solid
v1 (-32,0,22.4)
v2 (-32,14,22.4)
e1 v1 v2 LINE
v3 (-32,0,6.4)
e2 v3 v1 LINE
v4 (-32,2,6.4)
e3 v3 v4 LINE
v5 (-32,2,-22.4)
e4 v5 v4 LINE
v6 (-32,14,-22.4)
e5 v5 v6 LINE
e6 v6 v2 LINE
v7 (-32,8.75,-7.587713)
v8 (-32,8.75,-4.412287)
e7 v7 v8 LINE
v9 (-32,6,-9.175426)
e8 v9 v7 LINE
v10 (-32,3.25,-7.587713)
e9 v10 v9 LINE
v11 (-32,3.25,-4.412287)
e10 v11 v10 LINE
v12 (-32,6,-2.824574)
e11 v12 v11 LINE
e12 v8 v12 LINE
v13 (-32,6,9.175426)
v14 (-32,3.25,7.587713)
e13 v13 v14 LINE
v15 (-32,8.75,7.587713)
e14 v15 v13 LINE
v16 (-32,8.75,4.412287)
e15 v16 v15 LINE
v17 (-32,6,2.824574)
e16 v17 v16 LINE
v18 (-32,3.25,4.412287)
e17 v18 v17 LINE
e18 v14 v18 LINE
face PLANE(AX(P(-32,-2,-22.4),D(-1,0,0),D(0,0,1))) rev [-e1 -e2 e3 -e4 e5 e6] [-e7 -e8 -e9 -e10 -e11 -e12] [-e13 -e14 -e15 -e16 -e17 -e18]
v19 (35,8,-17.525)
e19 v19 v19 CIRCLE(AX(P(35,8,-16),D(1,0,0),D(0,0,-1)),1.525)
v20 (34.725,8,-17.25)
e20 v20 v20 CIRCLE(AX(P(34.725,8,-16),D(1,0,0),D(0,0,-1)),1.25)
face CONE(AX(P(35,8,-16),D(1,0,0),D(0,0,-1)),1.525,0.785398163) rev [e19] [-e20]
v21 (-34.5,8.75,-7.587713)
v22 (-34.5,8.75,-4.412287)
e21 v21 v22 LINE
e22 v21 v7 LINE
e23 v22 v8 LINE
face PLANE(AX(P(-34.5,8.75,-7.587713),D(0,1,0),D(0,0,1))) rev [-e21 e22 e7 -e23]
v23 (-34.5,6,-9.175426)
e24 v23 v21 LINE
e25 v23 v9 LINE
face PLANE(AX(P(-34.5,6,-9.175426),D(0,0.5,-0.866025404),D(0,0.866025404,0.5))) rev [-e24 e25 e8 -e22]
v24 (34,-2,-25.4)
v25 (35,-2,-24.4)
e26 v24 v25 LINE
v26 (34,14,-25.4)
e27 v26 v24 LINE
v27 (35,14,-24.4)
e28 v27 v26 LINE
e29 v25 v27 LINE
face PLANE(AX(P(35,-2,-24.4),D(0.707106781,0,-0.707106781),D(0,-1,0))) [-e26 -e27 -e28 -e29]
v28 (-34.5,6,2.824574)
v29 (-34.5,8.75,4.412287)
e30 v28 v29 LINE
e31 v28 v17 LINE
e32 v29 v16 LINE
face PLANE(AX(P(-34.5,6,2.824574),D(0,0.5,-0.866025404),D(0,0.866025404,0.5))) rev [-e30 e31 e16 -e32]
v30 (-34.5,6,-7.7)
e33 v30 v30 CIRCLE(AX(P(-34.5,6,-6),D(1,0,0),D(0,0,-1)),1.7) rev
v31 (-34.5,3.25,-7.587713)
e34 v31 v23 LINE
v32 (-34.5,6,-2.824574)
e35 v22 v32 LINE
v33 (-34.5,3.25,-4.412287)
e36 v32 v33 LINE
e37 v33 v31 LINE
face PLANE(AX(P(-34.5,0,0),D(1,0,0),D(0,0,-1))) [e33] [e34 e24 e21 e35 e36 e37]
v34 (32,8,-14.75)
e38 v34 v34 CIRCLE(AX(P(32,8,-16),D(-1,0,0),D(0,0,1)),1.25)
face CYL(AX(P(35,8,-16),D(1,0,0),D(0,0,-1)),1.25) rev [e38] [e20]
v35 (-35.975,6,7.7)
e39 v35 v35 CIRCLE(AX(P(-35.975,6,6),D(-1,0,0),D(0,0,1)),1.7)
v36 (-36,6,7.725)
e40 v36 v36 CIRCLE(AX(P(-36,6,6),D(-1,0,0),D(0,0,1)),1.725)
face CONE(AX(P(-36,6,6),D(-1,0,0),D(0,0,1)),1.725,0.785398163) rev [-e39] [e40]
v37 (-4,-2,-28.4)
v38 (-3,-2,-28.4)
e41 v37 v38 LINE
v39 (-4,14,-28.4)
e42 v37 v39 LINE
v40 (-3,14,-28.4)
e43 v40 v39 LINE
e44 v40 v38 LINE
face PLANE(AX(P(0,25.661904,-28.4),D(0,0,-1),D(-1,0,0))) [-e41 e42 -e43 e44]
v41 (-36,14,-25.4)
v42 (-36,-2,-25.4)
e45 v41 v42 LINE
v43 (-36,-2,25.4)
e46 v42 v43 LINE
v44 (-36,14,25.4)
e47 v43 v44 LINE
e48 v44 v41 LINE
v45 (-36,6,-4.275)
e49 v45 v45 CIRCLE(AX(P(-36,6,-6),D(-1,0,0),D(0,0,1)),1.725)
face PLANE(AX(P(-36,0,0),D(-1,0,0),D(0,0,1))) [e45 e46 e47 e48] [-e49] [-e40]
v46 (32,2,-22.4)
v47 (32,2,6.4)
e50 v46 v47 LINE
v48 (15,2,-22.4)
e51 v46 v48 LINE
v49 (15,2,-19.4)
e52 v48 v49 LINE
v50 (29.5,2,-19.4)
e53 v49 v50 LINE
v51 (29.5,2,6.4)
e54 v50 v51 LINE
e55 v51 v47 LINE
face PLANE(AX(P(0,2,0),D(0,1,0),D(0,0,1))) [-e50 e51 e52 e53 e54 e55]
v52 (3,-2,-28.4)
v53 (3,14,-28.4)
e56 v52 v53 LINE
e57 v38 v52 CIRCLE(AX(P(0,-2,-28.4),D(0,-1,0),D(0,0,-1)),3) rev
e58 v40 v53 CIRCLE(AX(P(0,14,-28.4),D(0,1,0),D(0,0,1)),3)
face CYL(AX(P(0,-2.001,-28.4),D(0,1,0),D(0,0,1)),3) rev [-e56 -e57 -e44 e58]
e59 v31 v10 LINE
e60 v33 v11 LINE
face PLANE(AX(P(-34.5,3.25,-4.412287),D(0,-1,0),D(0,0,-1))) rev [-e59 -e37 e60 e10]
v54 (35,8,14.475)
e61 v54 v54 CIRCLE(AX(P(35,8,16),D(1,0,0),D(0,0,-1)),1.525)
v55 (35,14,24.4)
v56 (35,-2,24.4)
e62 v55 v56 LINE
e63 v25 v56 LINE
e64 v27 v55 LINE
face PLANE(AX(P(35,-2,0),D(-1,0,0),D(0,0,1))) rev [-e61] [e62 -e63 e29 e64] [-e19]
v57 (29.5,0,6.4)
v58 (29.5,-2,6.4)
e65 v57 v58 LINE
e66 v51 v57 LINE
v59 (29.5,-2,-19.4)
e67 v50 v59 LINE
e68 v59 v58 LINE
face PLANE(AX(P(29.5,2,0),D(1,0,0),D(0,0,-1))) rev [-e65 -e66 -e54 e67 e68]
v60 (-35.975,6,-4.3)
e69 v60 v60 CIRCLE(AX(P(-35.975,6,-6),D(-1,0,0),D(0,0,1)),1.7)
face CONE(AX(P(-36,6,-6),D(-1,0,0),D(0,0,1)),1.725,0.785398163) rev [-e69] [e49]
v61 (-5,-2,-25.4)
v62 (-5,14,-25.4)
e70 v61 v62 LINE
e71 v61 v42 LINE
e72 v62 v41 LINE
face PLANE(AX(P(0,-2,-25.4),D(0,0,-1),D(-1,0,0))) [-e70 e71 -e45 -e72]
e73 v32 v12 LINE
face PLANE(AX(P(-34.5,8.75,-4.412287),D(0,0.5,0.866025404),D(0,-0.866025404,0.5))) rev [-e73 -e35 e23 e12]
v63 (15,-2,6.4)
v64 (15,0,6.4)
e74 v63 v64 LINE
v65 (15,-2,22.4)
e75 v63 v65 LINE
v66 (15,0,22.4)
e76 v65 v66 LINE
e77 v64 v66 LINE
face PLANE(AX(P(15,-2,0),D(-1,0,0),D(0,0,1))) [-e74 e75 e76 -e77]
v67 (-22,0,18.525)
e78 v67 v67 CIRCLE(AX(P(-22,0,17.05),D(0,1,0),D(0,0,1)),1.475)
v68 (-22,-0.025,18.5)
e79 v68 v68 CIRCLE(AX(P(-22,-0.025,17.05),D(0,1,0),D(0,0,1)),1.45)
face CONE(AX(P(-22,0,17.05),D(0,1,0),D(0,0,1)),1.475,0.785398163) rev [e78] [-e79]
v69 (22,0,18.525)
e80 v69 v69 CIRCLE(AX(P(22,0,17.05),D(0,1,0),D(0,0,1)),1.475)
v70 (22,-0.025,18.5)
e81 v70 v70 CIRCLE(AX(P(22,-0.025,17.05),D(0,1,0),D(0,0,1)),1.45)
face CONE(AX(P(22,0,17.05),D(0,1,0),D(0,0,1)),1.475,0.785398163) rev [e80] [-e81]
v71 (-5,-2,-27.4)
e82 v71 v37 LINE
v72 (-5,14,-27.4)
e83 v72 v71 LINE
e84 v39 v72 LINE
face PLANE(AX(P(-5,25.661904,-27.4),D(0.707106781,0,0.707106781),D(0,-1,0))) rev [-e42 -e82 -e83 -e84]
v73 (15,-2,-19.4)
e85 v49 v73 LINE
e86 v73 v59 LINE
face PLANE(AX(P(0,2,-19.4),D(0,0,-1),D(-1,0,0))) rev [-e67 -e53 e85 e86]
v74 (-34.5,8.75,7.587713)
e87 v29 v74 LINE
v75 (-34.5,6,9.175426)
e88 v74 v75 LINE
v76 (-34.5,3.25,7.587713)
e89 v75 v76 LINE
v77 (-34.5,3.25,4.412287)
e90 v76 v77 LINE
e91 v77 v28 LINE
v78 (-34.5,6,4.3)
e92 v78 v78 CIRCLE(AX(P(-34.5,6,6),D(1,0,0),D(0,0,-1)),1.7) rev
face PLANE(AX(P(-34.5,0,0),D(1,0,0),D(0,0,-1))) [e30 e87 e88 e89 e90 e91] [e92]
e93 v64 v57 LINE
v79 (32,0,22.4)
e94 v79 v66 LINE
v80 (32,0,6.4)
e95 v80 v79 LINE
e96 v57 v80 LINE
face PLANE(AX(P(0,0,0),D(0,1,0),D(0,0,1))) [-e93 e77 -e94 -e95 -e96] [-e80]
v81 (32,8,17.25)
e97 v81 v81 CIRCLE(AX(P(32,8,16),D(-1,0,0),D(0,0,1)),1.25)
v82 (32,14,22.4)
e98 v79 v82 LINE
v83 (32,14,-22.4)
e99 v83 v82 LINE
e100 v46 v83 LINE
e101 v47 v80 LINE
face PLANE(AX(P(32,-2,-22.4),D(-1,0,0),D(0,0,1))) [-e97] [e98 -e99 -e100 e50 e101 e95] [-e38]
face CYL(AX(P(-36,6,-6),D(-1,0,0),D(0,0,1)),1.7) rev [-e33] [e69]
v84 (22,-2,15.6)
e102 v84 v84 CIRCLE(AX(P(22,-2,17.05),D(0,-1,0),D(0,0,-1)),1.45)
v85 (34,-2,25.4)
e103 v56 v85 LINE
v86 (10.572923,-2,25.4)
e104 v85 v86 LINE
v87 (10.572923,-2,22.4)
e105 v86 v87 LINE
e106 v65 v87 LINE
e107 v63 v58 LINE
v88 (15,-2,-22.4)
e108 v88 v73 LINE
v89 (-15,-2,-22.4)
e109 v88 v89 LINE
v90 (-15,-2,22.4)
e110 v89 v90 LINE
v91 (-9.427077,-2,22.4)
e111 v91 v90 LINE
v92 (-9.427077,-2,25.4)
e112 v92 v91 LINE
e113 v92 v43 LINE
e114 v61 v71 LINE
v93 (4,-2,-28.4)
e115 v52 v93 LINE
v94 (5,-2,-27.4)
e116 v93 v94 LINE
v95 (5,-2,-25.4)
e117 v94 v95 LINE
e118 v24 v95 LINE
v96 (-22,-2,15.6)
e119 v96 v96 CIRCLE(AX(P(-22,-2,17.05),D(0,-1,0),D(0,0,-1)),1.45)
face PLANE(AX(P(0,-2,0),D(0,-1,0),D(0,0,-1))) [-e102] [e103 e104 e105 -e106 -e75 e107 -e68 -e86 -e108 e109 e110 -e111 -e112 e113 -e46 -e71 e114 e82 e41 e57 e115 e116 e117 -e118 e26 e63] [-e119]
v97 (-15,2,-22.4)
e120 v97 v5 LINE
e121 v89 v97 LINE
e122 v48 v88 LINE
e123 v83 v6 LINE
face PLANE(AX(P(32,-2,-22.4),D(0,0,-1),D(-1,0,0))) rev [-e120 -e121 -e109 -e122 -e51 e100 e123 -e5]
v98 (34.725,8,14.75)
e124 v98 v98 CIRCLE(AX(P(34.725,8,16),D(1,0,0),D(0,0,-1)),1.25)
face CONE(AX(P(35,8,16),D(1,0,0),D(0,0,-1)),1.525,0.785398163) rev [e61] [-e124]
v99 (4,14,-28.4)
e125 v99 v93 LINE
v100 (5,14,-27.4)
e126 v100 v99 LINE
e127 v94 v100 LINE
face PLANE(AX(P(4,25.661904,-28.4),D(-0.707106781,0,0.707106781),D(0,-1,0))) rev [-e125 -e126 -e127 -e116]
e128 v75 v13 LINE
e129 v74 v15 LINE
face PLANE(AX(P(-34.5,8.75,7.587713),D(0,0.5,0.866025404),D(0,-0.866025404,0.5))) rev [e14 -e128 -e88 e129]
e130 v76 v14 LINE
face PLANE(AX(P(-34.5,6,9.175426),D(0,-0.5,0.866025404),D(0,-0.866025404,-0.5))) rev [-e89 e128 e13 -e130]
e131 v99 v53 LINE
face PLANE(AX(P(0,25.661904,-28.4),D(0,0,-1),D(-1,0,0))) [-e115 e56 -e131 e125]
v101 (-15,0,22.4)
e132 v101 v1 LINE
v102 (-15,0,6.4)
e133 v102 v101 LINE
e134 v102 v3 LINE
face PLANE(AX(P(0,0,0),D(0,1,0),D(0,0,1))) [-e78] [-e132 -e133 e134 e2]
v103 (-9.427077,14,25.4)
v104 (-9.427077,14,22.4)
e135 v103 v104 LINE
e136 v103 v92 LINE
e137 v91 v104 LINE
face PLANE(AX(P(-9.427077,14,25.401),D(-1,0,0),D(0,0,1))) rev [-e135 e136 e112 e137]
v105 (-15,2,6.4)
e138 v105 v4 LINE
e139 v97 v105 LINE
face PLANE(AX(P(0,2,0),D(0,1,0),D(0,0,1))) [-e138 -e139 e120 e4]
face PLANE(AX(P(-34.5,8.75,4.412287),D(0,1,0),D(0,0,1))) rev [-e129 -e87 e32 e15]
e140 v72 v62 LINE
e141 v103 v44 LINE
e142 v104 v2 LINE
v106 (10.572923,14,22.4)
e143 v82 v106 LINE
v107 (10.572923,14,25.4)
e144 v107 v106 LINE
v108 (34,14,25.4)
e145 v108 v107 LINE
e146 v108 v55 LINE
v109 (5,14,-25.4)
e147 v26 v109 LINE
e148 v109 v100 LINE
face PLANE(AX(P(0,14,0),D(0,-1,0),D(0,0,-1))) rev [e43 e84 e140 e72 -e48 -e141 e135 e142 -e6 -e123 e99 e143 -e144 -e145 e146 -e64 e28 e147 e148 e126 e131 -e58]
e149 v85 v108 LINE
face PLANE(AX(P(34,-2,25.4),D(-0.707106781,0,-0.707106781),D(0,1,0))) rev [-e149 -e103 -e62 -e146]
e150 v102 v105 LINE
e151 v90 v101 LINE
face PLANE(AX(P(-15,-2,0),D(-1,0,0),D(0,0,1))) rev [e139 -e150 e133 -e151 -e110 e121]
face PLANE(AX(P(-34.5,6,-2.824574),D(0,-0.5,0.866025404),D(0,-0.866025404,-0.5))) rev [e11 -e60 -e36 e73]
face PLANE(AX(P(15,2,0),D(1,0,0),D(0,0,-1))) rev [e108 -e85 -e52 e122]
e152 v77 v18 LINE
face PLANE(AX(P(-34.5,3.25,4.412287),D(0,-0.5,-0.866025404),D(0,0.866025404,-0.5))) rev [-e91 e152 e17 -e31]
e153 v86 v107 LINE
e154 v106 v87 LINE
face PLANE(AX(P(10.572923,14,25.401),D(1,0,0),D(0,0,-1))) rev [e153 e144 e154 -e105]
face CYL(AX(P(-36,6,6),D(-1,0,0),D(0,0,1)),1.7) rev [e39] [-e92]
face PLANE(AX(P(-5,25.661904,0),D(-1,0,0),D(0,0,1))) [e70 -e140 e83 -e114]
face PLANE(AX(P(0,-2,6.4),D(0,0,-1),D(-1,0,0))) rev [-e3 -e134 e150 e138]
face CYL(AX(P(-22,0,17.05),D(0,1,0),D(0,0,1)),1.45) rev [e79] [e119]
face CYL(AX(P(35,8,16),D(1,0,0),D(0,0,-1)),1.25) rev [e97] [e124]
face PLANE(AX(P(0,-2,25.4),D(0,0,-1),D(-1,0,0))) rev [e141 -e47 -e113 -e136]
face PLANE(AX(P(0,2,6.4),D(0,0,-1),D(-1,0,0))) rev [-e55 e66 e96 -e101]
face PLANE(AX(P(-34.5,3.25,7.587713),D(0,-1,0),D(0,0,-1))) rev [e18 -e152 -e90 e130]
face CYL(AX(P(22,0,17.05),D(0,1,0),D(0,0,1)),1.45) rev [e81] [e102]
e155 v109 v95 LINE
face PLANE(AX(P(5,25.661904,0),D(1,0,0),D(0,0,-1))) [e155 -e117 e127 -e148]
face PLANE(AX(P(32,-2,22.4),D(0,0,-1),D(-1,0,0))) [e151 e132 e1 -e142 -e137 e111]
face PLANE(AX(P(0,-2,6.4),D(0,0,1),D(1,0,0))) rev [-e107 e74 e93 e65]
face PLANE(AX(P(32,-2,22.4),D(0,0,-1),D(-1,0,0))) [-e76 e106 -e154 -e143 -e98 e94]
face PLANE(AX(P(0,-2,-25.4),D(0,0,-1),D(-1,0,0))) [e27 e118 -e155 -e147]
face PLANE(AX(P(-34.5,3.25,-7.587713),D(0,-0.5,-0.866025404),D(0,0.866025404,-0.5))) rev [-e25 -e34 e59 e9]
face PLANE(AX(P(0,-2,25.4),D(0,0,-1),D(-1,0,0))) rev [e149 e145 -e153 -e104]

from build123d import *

# Parameters (mm, degrees)
EXTRUDE_1_DEPTH              = 14
EXTRUDE_1_DEPTH_BACK         = 2
SKETCH_1_W                   = 70
SKETCH_1_H                   = 50.8
SKETCH_1_W_2                 = 64
SKETCH_1_H_2                 = 44.8
EXTRUDE_1_2_DEPTH            = 2
EXTRUDE_1_2_DEPTH_BACK       = 2
SKETCH_1_3_W                 = 17
SKETCH_1_3_H                 = 28.8
SKETCH_1_4_W                 = 17
SKETCH_1_4_H                 = 16
EXTRUDE_2_DEPTH              = 2
CUT_EXTRUDE_1_REACH          = 62.876
SKETCH_3_W                   = 20
SKETCH_3_H                   = 16
EXTRUDE_START                = -2
EXTRUDE_5_OUTLINE_W          = 10
EXTRUDE_5_OUTLINE_H          = 3
EXTRUDE_5_DEPTH              = 16
CUT_EXTRUDE_2_REACH          = 49.828
SKETCH_11_R                  = 3
CHAMFER_1_SIZE               = 1
HOLE_WIZARD_M3_1_D           = 2.5
HOLE_WIZARD_M3_1_DEPTH       = 3
HOLE_WIZARD_M3_1_CSINK_D     = 3.05
HOLE_WIZARD_M3_1_CSINK_ANGLE = 90
SKETCH_16_W                  = 50.8
SKETCH_16_H                  = 16
EXTRUDE_6_DEPTH              = 1
CUT_EXTRUDE_3_DEPTH          = 2.5


# Read off the part's stored shape, not the designer's step: M2.5 间隙孔1, 凸台-拉伸5, M3 间隙孔1
with BuildPart() as part:
    # 草图1 → Extrude 1 (new, two sides: drawn at the far end of the back side and taken through both)
    with BuildSketch(Plane(origin=(0, 0, 0), x_dir=(1, 0, 0), z_dir=(0, 1, 0)).offset(-EXTRUDE_1_DEPTH_BACK)):
        Rectangle(SKETCH_1_W, SKETCH_1_H)
        Rectangle(SKETCH_1_W_2, SKETCH_1_H_2, mode=Mode.SUBTRACT)
    extrude(amount=EXTRUDE_1_DEPTH + EXTRUDE_1_DEPTH_BACK)

    # 草图1<3> → Extrude 1 2 (add, two sides: drawn at the far end of the back side and taken through both)
    with BuildSketch(Plane(origin=(0, 0, 0), x_dir=(1, 0, 0), z_dir=(0, 1, 0)).offset(-EXTRUDE_1_2_DEPTH_BACK)):
        Polygon((32, 22.4), (15, 22.4), (15, 19.4), (29.5, 19.4), (29.5, -6.4), (32, -6.4), align=None)
        with Locations((-23.5, 8)):
            Rectangle(SKETCH_1_3_W, SKETCH_1_3_H)
    extrude(amount=EXTRUDE_1_2_DEPTH + EXTRUDE_1_2_DEPTH_BACK)

    # 草图1<4> → 凸台-拉伸2 (add)
    with BuildSketch(Plane(origin=(0, 0, 0), x_dir=(1, 0, 0), z_dir=(0, 1, 0))):
        Polygon((15, -6.4), (15, -22.4), (32, -22.4), (32, -6.4), (29.5, -6.4), align=None)
        with Locations((-23.5, -14.4)):
            Rectangle(SKETCH_1_4_W, SKETCH_1_4_H)
    extrude(amount=-EXTRUDE_2_DEPTH)

    # 草图3 → 切除-拉伸1 (cut, up to next)
    with BuildSketch(Plane(origin=(0, 0, 22.4), x_dir=(-1, 0, 0), z_dir=(0, 0, -1)), mode=Mode.PRIVATE) as cut_extrude_1_sk1:
        with Locations((-0.572922779, 6)):
            Rectangle(SKETCH_3_W, SKETCH_3_H)
    cut_extrude_1_tool1 = extrude(cut_extrude_1_sk1.sketch, amount=-CUT_EXTRUDE_1_REACH, mode=Mode.PRIVATE) & part.part
    add(cut_extrude_1_tool1.solids().sort_by_distance((0.572923, 6, 22.4))[0], mode=Mode.SUBTRACT)

    # M2.5 间隙孔1 outline → M2.5 间隙孔1 (revolve, cut)
    with BuildSketch(Plane(origin=(22, 0, 17.05), x_dir=(1, 0, 0), z_dir=(0, 0, 1))):
        Polygon((0, -2), (1.45, -2), (1.45, -0.025), (1.475, 0), (0, 0), align=None)
    revolve(axis=Axis((22, 0, 17.05), (0, 1, 0)), mode=Mode.SUBTRACT)

    # Hole Wizard M2.5 _1 2 outline → Hole Wizard M2.5 _1 2 (revolve, cut)
    with BuildSketch(Plane(origin=(-22, 0, 17.05), x_dir=(1, 0, 0), z_dir=(0, 0, 1))):
        Polygon((0, -2), (1.45, -2), (1.45, -0.025), (1.475, 0), (0, 0), align=None)
    revolve(axis=Axis((-22, 0, 17.05), (0, 1, 0)), mode=Mode.SUBTRACT)

    # 凸台-拉伸5 outline → 凸台-拉伸5 (add)
    with BuildSketch(Plane(origin=(0, 0, 0), x_dir=(1, 0, 0), z_dir=(0, 1, 0)).offset(EXTRUDE_START)):
        with Locations((0, 26.9)):
            Rectangle(EXTRUDE_5_OUTLINE_W, EXTRUDE_5_OUTLINE_H)
    extrude(amount=EXTRUDE_5_DEPTH)

    # 草图11 → 切除-拉伸2 (cut, up to next)
    with BuildSketch(Plane(origin=(0, 14, 0), x_dir=(1, 0, 0), z_dir=(0, 1, 0)), mode=Mode.PRIVATE) as cut_extrude_2_sk1:
        with Locations((0, 28.4)):
            Circle(SKETCH_11_R)
    cut_extrude_2_tool1 = extrude(cut_extrude_2_sk1.sketch, amount=-CUT_EXTRUDE_2_REACH, mode=Mode.PRIVATE) & part.part
    add(cut_extrude_2_tool1.solids().sort_by_distance((0, 14, -28.4))[0], mode=Mode.SUBTRACT)

    # 倒角1
    chamfer_1_edges = [part.edges().sort_by_distance(p)[0] for p in [
        (5, 6, -28.4),
        (-5, 6, -28.4),
        (35, 6, -25.4),
        (35, 6, 25.4),
    ]]
    chamfer(chamfer_1_edges, length=CHAMFER_1_SIZE)

    # Hole Wizard M3 _1
    with Locations(Plane(origin=(35, 0, 0), x_dir=(0, 0, -1), z_dir=(1, 0, 0))):
        with Locations((-16, 8), (16, 8)):
            CounterSinkHole(HOLE_WIZARD_M3_1_D / 2, HOLE_WIZARD_M3_1_CSINK_D / 2, depth=HOLE_WIZARD_M3_1_DEPTH, counter_sink_angle=HOLE_WIZARD_M3_1_CSINK_ANGLE)

    # 草图16 → 凸台-拉伸6 (add)
    with BuildSketch(Plane.ZY.offset(35)):
        with Locations((0, 6)):
            Rectangle(SKETCH_16_W, SKETCH_16_H)
    extrude(amount=EXTRUDE_6_DEPTH)

    # Hole Wizard M3 _1 2 outline → Hole Wizard M3 _1 2 (revolve, cut)
    with BuildSketch(Plane(origin=(0, 6, 6), x_dir=(0, 1, 0), z_dir=(0, 0, -1))):
        Polygon((1.7, -35.975), (1.7, -32), (0, -32), (0, -36), (1.725, -36), align=None)
    revolve(axis=Axis((0, 6, 6), (1, 0, 0)), mode=Mode.SUBTRACT)

    # Hole Wizard M3 _1 2 2 outline → Hole Wizard M3 _1 2 2 (revolve, cut)
    with BuildSketch(Plane(origin=(0, 6, -6), x_dir=(0, 1, 0), z_dir=(0, 0, -1))):
        Polygon((1.7, -35.975), (1.7, -32), (0, -32), (0, -36), (1.725, -36), align=None)
    revolve(axis=Axis((0, 6, -6), (1, 0, 0)), mode=Mode.SUBTRACT)

    # 草图23 → 切除-拉伸3 (cut)
    with BuildSketch(Plane(origin=(-32, 0, 0), x_dir=(0, 0, -1), z_dir=(1, 0, 0))):
        Polygon((-9.175426481, 6), (-7.58771324, 3.25), (-4.41228676, 3.25), (-2.824573519, 6), (-4.41228676, 8.75), (-7.58771324, 8.75), align=None)
        Polygon((2.824573519, 6), (4.41228676, 3.25), (7.58771324, 3.25), (9.175426481, 6), (7.58771324, 8.75), (4.41228676, 8.75), align=None)
    extrude(amount=-CUT_EXTRUDE_3_DEPTH, mode=Mode.SUBTRACT)


solid = part.part
